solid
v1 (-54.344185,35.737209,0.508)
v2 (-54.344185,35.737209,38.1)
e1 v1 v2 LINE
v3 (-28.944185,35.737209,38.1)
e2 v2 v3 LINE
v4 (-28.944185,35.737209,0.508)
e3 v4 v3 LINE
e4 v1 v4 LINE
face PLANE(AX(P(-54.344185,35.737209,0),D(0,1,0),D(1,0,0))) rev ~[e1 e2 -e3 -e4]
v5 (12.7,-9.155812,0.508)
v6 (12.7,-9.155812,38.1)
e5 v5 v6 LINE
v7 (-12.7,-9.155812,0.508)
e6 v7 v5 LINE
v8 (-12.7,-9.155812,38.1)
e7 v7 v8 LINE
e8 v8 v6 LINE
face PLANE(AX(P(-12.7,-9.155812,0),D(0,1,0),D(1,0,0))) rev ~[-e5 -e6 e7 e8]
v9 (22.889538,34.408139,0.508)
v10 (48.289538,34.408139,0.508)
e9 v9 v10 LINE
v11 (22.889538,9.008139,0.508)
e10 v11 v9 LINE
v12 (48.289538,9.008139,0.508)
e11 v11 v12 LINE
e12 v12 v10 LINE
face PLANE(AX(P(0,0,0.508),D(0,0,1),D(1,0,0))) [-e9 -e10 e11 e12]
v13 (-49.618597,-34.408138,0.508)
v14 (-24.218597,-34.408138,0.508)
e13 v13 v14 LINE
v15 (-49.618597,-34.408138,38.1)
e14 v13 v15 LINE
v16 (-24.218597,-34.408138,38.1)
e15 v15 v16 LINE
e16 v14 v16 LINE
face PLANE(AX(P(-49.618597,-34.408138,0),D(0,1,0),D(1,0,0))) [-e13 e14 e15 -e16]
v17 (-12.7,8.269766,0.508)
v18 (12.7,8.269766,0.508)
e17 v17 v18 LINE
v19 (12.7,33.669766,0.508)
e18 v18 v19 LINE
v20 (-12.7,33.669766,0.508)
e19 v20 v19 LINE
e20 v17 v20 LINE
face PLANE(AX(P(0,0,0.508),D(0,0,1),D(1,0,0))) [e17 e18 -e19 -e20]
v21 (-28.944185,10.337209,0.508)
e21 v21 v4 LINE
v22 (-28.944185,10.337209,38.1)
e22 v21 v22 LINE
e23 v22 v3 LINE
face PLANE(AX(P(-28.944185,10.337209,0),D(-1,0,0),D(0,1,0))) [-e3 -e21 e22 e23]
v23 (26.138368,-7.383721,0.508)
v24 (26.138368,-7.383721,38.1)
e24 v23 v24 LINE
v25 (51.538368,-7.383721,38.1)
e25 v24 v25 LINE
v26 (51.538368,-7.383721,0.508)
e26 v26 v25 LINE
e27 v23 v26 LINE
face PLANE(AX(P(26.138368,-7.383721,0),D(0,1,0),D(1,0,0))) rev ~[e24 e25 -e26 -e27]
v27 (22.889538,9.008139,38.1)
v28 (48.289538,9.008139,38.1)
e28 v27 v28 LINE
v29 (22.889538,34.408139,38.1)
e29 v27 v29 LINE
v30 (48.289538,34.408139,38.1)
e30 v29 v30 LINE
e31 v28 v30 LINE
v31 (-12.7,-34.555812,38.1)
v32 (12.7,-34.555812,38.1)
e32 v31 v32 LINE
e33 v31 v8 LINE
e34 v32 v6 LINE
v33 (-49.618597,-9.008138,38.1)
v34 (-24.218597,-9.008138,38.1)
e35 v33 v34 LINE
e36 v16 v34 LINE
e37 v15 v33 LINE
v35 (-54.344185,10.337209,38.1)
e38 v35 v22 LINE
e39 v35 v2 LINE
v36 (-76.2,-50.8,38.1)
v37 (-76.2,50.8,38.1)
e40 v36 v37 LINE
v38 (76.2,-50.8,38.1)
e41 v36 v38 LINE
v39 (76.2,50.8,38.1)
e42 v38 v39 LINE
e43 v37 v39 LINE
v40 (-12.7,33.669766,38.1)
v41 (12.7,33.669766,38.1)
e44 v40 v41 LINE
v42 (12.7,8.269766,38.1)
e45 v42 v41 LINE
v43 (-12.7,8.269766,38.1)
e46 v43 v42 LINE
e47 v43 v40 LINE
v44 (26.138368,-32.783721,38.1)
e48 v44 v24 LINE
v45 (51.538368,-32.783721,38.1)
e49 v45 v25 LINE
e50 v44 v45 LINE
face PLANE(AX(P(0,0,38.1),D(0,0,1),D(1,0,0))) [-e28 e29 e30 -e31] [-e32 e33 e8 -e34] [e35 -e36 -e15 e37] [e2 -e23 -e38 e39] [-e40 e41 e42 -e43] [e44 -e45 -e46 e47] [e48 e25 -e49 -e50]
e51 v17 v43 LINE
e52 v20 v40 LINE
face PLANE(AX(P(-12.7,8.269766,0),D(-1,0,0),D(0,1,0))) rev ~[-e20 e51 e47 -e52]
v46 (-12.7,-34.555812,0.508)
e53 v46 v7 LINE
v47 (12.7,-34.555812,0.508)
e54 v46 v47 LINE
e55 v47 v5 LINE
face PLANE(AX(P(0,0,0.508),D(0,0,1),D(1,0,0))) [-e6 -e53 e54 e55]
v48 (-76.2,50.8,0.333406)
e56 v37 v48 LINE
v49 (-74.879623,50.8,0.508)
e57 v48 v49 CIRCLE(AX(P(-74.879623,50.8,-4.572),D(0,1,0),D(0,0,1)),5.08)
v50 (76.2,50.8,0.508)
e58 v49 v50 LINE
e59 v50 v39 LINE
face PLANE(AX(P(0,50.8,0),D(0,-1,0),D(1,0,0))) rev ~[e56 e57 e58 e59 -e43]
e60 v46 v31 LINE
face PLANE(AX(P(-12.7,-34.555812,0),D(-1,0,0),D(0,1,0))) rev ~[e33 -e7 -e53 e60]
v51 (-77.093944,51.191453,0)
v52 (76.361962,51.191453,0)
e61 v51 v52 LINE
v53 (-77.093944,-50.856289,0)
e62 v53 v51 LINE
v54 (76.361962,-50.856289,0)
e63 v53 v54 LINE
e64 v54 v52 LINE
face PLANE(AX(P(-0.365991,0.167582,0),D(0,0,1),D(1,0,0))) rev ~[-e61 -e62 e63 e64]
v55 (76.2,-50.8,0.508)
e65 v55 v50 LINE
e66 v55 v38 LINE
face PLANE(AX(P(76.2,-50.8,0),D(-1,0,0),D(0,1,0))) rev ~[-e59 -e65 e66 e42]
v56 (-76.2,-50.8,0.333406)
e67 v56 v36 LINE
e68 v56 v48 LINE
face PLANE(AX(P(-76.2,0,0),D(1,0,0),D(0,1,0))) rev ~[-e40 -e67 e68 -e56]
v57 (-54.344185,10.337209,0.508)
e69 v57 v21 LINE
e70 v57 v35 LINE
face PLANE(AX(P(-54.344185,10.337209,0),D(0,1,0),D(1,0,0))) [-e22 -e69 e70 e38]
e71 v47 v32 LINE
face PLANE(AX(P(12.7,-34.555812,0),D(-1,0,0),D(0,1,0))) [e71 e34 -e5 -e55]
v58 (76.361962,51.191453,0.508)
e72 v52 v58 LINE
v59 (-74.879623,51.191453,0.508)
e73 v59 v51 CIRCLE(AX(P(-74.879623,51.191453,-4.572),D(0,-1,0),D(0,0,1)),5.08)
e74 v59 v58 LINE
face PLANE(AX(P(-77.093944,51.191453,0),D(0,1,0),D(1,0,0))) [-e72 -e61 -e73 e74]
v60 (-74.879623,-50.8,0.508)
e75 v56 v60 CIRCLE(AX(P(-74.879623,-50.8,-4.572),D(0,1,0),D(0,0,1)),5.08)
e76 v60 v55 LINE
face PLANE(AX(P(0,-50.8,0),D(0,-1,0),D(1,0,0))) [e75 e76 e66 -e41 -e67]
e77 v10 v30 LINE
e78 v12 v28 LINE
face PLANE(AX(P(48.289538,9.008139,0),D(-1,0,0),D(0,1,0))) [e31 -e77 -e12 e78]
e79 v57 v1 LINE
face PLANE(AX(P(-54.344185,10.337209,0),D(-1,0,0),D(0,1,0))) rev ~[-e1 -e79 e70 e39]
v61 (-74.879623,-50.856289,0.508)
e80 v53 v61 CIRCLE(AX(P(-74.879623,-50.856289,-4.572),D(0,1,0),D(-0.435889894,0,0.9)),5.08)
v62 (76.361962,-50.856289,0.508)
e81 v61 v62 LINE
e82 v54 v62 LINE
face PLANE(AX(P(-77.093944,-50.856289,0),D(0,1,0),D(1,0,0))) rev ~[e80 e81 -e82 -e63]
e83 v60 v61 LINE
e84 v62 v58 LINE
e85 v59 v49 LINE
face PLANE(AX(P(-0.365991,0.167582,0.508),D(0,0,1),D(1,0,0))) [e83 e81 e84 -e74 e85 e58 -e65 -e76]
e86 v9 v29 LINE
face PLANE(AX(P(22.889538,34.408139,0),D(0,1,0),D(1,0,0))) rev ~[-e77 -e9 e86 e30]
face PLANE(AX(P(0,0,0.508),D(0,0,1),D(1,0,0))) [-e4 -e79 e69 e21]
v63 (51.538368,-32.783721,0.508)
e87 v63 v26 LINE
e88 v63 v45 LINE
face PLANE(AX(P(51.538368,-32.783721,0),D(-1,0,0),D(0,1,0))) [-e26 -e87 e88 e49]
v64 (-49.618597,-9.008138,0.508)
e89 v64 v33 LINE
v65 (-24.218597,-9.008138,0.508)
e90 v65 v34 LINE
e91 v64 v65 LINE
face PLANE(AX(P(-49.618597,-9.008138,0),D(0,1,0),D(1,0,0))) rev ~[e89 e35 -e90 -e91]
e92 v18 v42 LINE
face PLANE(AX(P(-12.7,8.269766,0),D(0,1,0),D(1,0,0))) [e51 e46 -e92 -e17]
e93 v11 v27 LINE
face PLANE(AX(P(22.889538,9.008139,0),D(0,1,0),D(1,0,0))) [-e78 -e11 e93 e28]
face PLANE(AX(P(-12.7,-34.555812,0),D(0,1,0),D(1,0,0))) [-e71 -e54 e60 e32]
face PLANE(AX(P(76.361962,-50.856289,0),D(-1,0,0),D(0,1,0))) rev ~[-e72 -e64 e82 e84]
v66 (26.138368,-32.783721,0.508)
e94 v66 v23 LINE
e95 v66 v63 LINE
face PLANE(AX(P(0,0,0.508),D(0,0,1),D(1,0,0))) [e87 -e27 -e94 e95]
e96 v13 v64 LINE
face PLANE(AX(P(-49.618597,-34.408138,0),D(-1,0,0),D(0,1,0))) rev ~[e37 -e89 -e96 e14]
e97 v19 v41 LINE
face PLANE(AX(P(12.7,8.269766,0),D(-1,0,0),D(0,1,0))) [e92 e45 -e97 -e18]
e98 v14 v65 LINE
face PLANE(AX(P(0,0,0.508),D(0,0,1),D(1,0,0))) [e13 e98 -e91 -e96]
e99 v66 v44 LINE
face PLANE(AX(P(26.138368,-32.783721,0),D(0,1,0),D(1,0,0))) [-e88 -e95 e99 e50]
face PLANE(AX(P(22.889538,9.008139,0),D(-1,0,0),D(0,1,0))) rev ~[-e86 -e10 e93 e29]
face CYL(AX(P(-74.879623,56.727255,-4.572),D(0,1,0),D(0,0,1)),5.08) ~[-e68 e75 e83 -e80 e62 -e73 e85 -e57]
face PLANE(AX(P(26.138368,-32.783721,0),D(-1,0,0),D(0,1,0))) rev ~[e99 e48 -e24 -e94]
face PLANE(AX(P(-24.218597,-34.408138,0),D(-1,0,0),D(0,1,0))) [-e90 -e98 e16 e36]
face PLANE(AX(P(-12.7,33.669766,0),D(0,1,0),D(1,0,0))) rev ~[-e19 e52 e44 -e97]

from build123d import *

# Parameters (mm, degrees)
F1_W         = 152.4
F1_H         = 101.6
F1_W_2       = 25.4
F1_H_2       = 25.4
F2_DEPTH     = 38.1
F3_W         = 153.4559056163
F3_H         = 102.0477414131
F3_W_2       = 152.4
F3_H_2       = 101.6
F4_DEPTH     = 0.508
F0_W         = 152.4
F0_H         = 101.6
F5_DEPTH     = 0.508
F6_T4_DEPTH  = 113.1193447297
F6_T9_DEPTH  = 113.1193447297
F6_T14_DEPTH = 113.1193447297


# Not quite as in the source:
# - a fillet or chamfer that OpenCascade refuses, or shapes differently, is made with other operations: its cross-section is extruded or revolved along the edge and cut away or added


with BuildPart() as f2:
    # F1 (on face) → F2 (new body)
    with BuildSketch(Plane.XY):
        Rectangle(F1_W, F1_H)
        with Locations((-36.918597445, -21.7081383014)):
            Rectangle(F1_W_2, F1_H_2, mode=Mode.SUBTRACT)
        with Locations((0, -21.855811876)):
            Rectangle(F1_W_2, F1_H_2, mode=Mode.SUBTRACT)
        with Locations((38.8383678732, -20.0837206056)):
            Rectangle(F1_W_2, F1_H_2, mode=Mode.SUBTRACT)
        with Locations((-41.6441853324, 23.0372088479)):
            Rectangle(F1_W_2, F1_H_2, mode=Mode.SUBTRACT)
        with Locations((0, 20.9697662408)):
            Rectangle(F1_W_2, F1_H_2, mode=Mode.SUBTRACT)
        with Locations((35.5895380648, 21.7081389993)):
            Rectangle(F1_W_2, F1_H_2, mode=Mode.SUBTRACT)
    extrude(amount=F2_DEPTH)

    # F3 (on face) → F4 (join)
    with BuildSketch(Plane.XY):
        with Locations((-0.3659911454, 0.1675821841)):
            Rectangle(F3_W, F3_H)
        Rectangle(F3_W_2, F3_H_2, mode=Mode.SUBTRACT)
    extrude(amount=F4_DEPTH)

    # F0 (on Top) → F5 (join)
    with BuildSketch(Plane.XY):
        Rectangle(F0_W, F0_H)
    extrude(amount=F5_DEPTH)

    # F6: fillet of radius 5.08 on 1 edges, made by hand


with BuildPart() as f6_tool2:
    # F6_s3 → F6_t4 (new body)
    with BuildSketch(Plane.XZ.offset(-56.7272545489)):
        with BuildLine():
            ThreePointArc((-74.8796232902, 0.508), (-76.0155458228, 0.3793715272), (-77.0939439535, 0))
            Line((-77.0939439535, 0), (-77.0939439535, 0.508))
            Line((-77.0939439535, 0.508), (-74.8796232902, 0.508))
        make_face()
    extrude(amount=F6_T4_DEPTH)

    split(bisect_by=Plane.XZ.offset(-50.8), keep=Keep.BOTTOM)


with BuildPart() as f2_1:
    add(f2.part)

    # F6_t1: cut F6_tool2
    add(f6_tool2.part, mode=Mode.SUBTRACT)


with BuildPart() as f6_tool7:
    # F6_s8 → F6_t9 (new body)
    with BuildSketch(Plane.XZ.offset(-56.7272545489)):
        with BuildLine():
            ThreePointArc((-74.8796232902, 0.508), (-76.0155458228, 0.3793715272), (-77.0939439535, 0))
            Line((-77.0939439535, 0), (-77.0939439535, 0.508))
            Line((-77.0939439535, 0.508), (-74.8796232902, 0.508))
        make_face()
    extrude(amount=F6_T9_DEPTH)

    split(bisect_by=Plane.YZ.offset(-76.2), keep=Keep.BOTTOM)


with BuildPart() as f2_2:
    add(f2_1.part)

    # F6_t6: cut F6_tool7
    add(f6_tool7.part, mode=Mode.SUBTRACT)


with BuildPart() as f6_tool12:
    # F6_s13 → F6_t14 (new body)
    with BuildSketch(Plane.XZ.offset(-56.7272545489)):
        with BuildLine():
            ThreePointArc((-74.8796232902, 0.508), (-76.0155458228, 0.3793715272), (-77.0939439535, 0))
            Line((-77.0939439535, 0), (-77.0939439535, 0.508))
            Line((-77.0939439535, 0.508), (-74.8796232902, 0.508))
        make_face()
    extrude(amount=F6_T14_DEPTH)

    split(bisect_by=Plane.XZ.offset(50.8), keep=Keep.TOP)


with BuildPart() as f2_3:
    add(f2_2.part)

    # F6_t11: cut F6_tool12
    add(f6_tool12.part, mode=Mode.SUBTRACT)


solid = f2_3.part
